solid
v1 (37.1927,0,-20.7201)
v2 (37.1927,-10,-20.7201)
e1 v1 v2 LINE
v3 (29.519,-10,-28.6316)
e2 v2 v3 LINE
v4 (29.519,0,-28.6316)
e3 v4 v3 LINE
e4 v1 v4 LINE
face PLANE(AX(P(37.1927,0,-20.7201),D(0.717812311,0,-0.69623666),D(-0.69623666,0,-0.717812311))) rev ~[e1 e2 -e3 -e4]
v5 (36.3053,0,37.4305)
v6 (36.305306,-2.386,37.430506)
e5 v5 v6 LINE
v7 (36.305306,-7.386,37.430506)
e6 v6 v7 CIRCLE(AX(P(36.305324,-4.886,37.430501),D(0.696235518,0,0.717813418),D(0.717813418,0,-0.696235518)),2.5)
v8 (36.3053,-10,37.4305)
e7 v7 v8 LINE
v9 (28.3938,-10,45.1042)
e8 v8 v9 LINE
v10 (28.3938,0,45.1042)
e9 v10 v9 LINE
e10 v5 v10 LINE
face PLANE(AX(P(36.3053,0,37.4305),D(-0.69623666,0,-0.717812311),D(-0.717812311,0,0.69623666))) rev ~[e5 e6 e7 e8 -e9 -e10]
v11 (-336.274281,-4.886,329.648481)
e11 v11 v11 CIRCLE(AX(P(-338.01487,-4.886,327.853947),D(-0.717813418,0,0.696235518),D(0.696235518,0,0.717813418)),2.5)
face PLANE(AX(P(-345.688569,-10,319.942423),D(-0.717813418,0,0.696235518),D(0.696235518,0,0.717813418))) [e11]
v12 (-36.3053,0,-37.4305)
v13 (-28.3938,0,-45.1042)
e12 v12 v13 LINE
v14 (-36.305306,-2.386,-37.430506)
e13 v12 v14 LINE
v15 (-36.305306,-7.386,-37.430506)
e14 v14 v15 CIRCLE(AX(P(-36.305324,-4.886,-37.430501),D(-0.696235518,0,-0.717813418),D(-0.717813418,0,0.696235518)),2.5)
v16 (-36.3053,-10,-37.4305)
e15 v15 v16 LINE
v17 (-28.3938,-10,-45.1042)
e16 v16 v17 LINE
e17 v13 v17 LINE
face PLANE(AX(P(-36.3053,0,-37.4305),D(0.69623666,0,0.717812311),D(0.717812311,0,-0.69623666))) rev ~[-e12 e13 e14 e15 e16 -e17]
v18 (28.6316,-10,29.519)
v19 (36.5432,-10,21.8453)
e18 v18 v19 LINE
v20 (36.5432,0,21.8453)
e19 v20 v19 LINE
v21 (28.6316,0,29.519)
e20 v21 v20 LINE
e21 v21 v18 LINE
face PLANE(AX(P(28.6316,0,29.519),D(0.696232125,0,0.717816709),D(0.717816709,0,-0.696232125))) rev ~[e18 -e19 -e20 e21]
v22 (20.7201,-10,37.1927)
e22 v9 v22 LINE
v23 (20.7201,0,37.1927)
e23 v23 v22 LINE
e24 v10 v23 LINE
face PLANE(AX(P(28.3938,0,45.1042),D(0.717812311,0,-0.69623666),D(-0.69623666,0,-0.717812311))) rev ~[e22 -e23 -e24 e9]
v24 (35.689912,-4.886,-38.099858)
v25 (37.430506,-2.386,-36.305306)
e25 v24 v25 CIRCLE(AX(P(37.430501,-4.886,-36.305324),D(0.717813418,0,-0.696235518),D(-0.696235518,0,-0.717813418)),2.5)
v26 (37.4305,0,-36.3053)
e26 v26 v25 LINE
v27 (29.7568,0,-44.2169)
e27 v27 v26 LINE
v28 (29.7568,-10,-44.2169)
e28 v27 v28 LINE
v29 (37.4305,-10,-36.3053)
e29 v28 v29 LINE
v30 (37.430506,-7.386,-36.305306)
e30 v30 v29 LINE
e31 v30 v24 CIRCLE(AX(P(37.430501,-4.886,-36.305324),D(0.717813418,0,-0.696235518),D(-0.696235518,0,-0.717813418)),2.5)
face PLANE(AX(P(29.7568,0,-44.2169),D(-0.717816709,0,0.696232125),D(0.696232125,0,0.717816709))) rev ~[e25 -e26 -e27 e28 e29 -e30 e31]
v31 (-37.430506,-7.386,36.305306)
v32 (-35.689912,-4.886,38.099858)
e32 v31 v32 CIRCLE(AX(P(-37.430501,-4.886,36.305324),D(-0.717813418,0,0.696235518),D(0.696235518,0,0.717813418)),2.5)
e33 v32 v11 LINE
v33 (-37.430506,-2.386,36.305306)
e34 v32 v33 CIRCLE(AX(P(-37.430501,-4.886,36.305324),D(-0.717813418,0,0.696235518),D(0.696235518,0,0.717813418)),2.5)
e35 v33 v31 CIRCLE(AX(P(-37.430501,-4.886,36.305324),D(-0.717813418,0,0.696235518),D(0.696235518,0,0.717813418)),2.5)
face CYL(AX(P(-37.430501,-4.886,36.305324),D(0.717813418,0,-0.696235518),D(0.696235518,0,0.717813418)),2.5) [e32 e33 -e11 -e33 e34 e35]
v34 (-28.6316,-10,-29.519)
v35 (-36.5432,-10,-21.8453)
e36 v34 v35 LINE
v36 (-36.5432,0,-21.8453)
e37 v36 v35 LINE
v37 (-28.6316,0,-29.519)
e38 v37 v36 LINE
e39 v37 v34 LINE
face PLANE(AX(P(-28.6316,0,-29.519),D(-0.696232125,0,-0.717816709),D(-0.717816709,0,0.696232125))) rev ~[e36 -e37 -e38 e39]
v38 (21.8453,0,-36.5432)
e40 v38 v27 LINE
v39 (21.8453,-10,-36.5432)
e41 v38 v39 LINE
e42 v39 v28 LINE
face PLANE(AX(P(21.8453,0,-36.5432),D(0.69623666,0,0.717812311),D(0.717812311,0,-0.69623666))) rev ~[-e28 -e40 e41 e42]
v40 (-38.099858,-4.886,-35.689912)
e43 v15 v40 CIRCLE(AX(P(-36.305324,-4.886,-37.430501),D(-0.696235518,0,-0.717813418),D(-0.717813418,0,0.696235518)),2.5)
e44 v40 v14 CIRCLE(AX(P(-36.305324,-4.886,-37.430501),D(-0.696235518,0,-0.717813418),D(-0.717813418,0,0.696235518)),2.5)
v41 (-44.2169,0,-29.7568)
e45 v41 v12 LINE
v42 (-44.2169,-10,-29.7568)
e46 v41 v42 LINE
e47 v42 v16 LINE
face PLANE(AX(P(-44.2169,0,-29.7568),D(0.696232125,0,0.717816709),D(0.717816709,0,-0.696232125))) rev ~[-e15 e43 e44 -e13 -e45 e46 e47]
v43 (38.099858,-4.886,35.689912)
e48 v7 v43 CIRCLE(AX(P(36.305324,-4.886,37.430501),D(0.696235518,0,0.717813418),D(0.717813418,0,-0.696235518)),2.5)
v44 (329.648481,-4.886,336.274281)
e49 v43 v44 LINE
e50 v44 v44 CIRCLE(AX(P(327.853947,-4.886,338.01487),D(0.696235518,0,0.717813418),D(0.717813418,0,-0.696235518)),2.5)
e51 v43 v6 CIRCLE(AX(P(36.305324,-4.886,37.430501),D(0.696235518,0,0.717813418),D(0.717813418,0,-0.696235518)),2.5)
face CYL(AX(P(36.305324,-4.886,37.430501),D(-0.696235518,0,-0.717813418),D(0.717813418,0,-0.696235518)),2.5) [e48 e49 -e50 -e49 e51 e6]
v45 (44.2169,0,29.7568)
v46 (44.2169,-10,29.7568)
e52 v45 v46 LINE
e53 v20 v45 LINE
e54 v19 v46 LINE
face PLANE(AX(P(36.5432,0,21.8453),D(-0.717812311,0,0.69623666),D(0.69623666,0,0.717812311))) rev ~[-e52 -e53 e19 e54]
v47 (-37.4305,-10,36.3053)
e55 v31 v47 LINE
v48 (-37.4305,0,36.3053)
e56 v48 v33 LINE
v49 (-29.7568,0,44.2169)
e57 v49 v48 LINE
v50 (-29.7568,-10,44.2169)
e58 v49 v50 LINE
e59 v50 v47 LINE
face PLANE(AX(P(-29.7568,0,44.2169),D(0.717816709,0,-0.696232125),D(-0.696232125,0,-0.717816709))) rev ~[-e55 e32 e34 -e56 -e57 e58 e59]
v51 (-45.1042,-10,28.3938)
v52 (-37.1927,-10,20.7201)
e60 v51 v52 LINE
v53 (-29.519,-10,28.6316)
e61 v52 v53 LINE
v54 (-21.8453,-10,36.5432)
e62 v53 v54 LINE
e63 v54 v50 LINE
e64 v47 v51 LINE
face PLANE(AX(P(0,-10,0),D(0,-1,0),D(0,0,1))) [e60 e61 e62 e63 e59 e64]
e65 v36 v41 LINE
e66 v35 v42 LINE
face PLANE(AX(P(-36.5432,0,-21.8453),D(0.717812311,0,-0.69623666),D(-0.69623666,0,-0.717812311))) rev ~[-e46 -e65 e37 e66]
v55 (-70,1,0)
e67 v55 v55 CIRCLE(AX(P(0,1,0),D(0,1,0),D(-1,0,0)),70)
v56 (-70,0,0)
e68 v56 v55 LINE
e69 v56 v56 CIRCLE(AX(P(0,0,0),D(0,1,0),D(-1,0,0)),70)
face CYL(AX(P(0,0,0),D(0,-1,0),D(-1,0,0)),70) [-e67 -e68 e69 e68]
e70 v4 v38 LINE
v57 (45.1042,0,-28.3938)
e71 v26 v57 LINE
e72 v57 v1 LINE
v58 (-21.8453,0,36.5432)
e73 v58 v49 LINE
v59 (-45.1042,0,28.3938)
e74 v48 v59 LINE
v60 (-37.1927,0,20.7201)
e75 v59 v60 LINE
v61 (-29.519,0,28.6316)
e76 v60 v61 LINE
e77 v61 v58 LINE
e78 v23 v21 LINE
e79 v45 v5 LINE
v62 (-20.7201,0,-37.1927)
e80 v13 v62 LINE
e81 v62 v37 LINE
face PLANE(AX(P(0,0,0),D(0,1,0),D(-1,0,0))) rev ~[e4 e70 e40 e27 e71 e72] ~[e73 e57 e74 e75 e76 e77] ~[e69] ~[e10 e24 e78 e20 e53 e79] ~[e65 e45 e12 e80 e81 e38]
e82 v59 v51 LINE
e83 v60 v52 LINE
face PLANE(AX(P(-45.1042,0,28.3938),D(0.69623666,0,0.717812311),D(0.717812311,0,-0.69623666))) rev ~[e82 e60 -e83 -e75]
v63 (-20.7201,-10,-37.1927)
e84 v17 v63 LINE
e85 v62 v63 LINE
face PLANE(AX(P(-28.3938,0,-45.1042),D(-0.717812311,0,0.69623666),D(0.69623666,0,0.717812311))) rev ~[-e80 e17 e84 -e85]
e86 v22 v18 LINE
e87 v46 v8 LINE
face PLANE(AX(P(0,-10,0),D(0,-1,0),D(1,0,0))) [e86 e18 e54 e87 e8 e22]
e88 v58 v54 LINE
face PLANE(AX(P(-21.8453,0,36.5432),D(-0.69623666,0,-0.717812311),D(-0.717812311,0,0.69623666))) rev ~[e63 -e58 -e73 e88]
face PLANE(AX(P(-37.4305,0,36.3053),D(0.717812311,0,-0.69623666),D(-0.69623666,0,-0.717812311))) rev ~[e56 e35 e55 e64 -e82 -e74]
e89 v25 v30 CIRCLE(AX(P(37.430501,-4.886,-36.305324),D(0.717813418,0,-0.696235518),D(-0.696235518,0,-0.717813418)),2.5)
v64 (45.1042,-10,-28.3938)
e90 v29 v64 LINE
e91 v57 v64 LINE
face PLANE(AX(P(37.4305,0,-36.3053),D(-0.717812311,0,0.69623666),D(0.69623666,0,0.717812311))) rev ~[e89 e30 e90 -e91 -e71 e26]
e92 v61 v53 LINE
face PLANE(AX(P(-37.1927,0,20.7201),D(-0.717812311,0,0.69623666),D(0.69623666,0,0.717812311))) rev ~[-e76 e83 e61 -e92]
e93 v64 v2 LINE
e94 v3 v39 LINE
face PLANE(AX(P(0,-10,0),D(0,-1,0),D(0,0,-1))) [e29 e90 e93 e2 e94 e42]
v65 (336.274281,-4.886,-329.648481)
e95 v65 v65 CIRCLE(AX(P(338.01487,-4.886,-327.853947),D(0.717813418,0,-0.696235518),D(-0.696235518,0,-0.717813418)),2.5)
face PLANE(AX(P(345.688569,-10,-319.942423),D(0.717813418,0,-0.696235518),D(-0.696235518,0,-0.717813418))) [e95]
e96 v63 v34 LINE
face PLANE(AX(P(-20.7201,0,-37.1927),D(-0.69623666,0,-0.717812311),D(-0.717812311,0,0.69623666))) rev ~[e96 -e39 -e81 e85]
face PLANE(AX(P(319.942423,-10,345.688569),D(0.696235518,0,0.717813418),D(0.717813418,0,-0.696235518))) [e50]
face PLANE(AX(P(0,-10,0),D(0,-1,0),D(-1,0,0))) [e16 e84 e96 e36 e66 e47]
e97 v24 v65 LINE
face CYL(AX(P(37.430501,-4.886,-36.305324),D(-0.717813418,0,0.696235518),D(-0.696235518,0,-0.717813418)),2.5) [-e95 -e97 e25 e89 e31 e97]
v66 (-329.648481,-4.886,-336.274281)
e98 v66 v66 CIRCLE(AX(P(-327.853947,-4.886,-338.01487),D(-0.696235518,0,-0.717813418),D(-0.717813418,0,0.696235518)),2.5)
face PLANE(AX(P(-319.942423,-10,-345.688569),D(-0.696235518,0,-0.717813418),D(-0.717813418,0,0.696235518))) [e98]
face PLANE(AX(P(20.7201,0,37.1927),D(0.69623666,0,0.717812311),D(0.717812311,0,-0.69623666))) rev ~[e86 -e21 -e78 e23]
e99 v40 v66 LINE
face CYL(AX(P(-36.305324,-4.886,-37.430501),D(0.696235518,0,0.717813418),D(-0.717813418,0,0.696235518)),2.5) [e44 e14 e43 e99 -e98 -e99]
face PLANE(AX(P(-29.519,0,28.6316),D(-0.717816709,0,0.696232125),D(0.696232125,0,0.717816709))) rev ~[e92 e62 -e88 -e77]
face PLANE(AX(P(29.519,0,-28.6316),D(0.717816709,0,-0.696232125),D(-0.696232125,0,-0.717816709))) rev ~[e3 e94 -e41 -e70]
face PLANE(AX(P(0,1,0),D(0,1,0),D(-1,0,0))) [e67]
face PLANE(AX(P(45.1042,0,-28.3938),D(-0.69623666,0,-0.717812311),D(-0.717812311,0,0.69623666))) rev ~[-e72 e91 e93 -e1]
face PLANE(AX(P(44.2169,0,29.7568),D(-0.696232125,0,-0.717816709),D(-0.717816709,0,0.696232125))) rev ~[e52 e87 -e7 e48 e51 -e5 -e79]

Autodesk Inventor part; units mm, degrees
ref_plane "YZ Plane" through (0, 0, 0) normal (1, 0, 0) x (0, 1, 0)
ref_plane "XZ Plane" through (0, 0, 0) normal (0, 1, 0) x (-1, 0, 0)
ref_plane "XY Plane" through (0, 0, 0) normal (0, 0, 1) x (1, 0, 0)
sketch "Sketch1" plane through (0, 0, 0) normal (0, 1, 0) x (-1, 0, 0)
  circle A0 centre (0, 0) radius 70
  dimension "d0" = 140
extrude "Extrusion1" add sketch "Sketch1" along normal blind 1
sketch "Sketch2" plane through (0, 0, 0) normal (0, -1, 0) x (1, 0, 0)
  line L0 (0, 0) -> (36.3053, 37.4305)
  line L1 (36.3053, 37.4305) -> (28.3938, 45.1042)
  line L2 (28.3938, 45.1042) -> (20.7201, 37.1927)
  line L3 (20.7201, 37.1927) -> (28.6316, 29.519)
  line L4 (36.5432, 21.8453) -> (44.2169, 29.7568)
  line L5 (44.2169, 29.7568) -> (36.3053, 37.4305)
  line L6 (28.6316, 29.519) -> (36.5432, 21.8453)
extrude "Extrusion2" add sketch "Sketch2" along normal blind 10
sketch "Sketch3" plane through (28.3938, -10, 45.1042) normal (0.6962355, 0, 0.7178134) x (0.7178134, 0, -0.6962355)
  circle A0 centre (11.0217, 5.114) radius 2.5
  point P0 (11.0217, 10)
  dimension "d5" = 5
extrude "Extrusion3" add sketch "Sketch3" along normal blind 418.75
pattern_circular "Circular Pattern1" count 4 over 360 about axis through (0, 0, 0) along (0, 1, 0) of "Extrusion2", "Extrusion3"
properties part number "Spinning Platform"
